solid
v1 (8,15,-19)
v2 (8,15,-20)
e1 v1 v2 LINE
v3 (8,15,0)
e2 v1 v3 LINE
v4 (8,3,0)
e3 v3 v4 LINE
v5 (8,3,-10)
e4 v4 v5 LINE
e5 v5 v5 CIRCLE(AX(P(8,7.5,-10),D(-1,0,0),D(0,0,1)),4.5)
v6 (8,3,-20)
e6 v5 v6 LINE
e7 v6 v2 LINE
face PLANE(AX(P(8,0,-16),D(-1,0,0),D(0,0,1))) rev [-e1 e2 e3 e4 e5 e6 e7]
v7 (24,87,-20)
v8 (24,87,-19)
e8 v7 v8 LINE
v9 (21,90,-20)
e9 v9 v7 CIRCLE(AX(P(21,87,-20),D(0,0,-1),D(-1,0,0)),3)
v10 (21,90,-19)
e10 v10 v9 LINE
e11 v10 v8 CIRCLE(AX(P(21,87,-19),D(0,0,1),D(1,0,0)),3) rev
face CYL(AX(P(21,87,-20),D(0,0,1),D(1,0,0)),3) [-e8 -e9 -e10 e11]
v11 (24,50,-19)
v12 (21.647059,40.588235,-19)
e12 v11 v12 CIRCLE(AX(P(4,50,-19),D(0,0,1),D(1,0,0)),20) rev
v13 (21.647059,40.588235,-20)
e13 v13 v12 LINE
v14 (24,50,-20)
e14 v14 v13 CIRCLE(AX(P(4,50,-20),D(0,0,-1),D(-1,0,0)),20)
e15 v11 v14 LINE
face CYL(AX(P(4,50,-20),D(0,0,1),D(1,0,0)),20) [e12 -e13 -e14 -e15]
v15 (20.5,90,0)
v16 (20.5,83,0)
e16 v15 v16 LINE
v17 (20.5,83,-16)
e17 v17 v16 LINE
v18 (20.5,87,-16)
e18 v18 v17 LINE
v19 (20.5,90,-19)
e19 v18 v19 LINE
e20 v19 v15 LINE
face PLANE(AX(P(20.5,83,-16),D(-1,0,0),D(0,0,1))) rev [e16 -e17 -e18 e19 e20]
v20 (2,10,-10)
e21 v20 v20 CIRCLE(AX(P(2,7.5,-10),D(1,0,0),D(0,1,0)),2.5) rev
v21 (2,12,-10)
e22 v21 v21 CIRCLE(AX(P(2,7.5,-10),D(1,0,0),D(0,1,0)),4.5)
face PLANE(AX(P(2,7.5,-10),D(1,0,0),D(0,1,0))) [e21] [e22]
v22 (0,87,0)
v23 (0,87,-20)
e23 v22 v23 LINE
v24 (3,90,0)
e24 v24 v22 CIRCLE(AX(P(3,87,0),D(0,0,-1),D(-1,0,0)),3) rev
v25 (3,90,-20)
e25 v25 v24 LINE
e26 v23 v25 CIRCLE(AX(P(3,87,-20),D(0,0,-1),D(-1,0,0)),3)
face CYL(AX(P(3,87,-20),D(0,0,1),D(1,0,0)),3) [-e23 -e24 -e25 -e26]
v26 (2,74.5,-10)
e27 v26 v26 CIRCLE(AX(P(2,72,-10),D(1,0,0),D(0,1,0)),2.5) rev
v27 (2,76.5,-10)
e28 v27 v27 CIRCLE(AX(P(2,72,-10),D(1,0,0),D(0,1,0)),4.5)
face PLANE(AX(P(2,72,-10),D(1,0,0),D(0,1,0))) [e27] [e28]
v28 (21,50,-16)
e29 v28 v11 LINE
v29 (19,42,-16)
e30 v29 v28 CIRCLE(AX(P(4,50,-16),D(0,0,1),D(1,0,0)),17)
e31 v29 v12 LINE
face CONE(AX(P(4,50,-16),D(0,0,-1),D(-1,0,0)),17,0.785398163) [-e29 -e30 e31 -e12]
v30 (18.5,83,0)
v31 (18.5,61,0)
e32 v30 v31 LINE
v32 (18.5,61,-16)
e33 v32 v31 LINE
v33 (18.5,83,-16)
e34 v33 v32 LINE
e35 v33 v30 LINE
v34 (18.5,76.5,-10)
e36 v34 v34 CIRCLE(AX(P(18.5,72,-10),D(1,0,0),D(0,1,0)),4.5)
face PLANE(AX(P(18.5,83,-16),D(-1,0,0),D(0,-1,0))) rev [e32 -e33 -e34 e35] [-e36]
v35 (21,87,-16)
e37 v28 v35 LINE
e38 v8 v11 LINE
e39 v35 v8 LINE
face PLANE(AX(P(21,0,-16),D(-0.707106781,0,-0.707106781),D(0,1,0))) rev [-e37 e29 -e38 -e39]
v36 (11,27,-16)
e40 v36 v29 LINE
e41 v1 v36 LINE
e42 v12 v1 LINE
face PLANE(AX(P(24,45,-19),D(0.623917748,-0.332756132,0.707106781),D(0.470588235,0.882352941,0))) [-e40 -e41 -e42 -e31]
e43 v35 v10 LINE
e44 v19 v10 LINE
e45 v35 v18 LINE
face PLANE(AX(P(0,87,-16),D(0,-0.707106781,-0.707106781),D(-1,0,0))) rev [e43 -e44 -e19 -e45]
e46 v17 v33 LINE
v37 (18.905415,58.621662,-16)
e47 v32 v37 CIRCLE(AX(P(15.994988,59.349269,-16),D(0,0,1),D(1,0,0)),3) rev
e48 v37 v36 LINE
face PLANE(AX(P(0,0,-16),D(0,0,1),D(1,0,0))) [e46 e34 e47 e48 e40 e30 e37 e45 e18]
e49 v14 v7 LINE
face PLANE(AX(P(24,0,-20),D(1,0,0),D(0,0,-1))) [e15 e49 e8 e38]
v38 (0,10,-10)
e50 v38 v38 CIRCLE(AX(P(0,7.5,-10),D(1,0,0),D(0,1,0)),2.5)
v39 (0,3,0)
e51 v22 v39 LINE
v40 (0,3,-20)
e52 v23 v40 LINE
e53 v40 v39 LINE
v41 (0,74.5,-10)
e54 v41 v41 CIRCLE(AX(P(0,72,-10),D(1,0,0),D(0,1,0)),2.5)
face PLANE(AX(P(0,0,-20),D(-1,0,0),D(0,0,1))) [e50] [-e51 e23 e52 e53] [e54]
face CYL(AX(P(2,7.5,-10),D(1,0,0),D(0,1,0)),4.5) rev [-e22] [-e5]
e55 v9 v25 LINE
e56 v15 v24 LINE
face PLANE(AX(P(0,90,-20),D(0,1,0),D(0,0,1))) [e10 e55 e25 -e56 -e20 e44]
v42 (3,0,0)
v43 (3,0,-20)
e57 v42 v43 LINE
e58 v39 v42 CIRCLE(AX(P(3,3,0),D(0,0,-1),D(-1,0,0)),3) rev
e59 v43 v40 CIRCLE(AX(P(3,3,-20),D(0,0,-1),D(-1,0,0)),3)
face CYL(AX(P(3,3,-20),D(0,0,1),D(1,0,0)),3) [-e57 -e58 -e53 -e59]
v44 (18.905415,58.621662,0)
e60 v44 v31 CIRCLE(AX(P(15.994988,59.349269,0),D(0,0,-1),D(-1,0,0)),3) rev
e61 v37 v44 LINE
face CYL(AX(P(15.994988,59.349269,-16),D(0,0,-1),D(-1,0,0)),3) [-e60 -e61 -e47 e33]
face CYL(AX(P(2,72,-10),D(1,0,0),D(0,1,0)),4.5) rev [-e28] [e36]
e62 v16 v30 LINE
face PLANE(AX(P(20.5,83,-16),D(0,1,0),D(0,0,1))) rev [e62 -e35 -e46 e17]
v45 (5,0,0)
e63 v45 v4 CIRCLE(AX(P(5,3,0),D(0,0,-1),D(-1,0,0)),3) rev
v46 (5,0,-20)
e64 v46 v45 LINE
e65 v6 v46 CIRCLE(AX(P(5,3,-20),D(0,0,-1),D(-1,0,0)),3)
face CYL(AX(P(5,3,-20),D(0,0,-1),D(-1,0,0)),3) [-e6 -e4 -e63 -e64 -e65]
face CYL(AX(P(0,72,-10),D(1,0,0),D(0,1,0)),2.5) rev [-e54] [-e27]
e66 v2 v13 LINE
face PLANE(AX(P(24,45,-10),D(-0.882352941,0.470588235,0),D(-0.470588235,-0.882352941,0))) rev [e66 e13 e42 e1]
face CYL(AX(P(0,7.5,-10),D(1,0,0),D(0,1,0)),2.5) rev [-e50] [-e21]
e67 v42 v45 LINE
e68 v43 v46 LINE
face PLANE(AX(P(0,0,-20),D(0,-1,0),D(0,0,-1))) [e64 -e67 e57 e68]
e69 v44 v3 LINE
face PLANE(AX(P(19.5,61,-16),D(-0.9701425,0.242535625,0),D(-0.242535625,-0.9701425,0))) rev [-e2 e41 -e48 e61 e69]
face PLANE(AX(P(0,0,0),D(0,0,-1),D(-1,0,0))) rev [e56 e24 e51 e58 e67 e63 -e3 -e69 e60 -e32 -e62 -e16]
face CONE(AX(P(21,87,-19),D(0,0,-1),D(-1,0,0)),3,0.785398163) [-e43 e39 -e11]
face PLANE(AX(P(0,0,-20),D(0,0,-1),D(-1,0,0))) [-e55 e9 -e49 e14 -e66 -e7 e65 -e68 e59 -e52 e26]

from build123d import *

# Parameters (mm, degrees)
SKETCH1_W           = 24
SKETCH1_H           = 90
BOSS_EXTRUDE1_DEPTH = 20
CUT_EXTRUDE1_DEPTH  = 16
CUT_EXTRUDE8_DEPTH  = 10
FILLET1_R           = 20
SKETCH12_R          = 2.5
CUT_EXTRUDE9_DEPTH  = 18.5
SKETCH13_R          = 4.5
CUT_EXTRUDE10_DEPTH = 16.5
FILLET2_R           = 3
CHAMFER1_SIZE       = 3


with BuildPart() as part:
    # Sketch1 → Boss-Extrude1 (new body)
    with BuildSketch(Plane.XY):
        with Locations((12, 45)):
            Rectangle(SKETCH1_W, SKETCH1_H)
    extrude(amount=-BOSS_EXTRUDE1_DEPTH)

    # Sketch4 → Cut-Extrude1 (cut)
    with BuildSketch(Plane.XY):
        Polygon((20.5, 83), (18.5, 83), (18.5, 61), (19.5, 61), (8, 15), (8, 0), (24, 0), (24, 90), (20.5, 90), align=None)
    extrude(amount=-CUT_EXTRUDE1_DEPTH, mode=Mode.SUBTRACT)

    # Sketch9 → Cut-Extrude8 (cut)
    with BuildSketch(Plane(origin=(0, 0, -20), x_dir=(-1, 0, 0), z_dir=(0, 0, -1))):
        Polygon((-24, 0), (-24, 45), (-8, 15), (-8, 0), align=None)
    extrude(amount=-CUT_EXTRUDE8_DEPTH, mode=Mode.SUBTRACT)

    # Fillet1
    fillet1_edges = [part.edges().sort_by_distance(p)[0] for p in [
        (24, 45, -18),
    ]]
    fillet(fillet1_edges, radius=FILLET1_R)

    # Sketch12 → Cut-Extrude9 (cut)
    with BuildSketch(Plane(origin=(18.5, 0, 0), x_dir=(0, 0, -1), z_dir=(1, 0, 0))):
        with Locations(Location((10, 72, 0), (0, 0, 90))):
            Circle(SKETCH12_R)
        with Locations(Location((10, 7.5, 0), (0, 0, 90))):
            Circle(SKETCH12_R)
    extrude(amount=-CUT_EXTRUDE9_DEPTH, mode=Mode.SUBTRACT)

    # Sketch13 → Cut-Extrude10 (cut)
    with BuildSketch(Plane(origin=(18.5, 0, 0), x_dir=(0, 0, -1), z_dir=(1, 0, 0))):
        with Locations(Location((10, 72, 0), (0, 0, 90))):
            Circle(SKETCH13_R)
        with Locations(Location((10, 7.5, 0), (0, 0, 90))):
            Circle(SKETCH13_R)
    extrude(amount=-CUT_EXTRUDE10_DEPTH, mode=Mode.SUBTRACT)

    # Fillet2
    # the kernel refuses this fillet: 3 mm, written as the material it takes off along each edge
    with BuildSketch(Plane(origin=(0, 90, 7.5), x_dir=(1, 0, 0), z_dir=(0, 0, -1)), Plane(origin=(8, 0, -27.5), x_dir=(0, 1, 0), z_dir=(0, 0, 1)), Plane(origin=(0, 0, 7.5), x_dir=(0, 1, 0), z_dir=(0, 0, -1))) as fillet2_piece_1:
        with BuildLine():
            CenterArc((FILLET2_R, FILLET2_R), FILLET2_R, 180, 90)
            Line((0, FILLET2_R), (-FILLET2_R * 0.02, FILLET2_R))
            Line((-FILLET2_R * 0.02, FILLET2_R), (-FILLET2_R * 0.02, -FILLET2_R * 0.02))
            Line((-FILLET2_R * 0.02, -FILLET2_R * 0.02), (FILLET2_R, -FILLET2_R * 0.02))
            Line((FILLET2_R, -FILLET2_R * 0.02), (FILLET2_R, 0))
        make_face()
    extrude(amount=35, mode=Mode.SUBTRACT)
    with BuildSketch(Plane(origin=(24, 90, -8.5), x_dir=(0, -1, 0), z_dir=(0, 0, -1))) as fillet2_piece_2:
        with BuildLine():
            CenterArc((FILLET2_R, FILLET2_R), FILLET2_R, 180, 90)
            Line((0, FILLET2_R), (-FILLET2_R * 0.02, FILLET2_R))
            Line((-FILLET2_R * 0.02, FILLET2_R), (-FILLET2_R * 0.02, -FILLET2_R * 0.02))
            Line((-FILLET2_R * 0.02, -FILLET2_R * 0.02), (FILLET2_R, -FILLET2_R * 0.02))
            Line((FILLET2_R, -FILLET2_R * 0.02), (FILLET2_R, 0))
        make_face()
    extrude(amount=19, mode=Mode.SUBTRACT)
    with BuildSketch(Plane(origin=(19.5, 61, 6.128837665), x_dir=(-0.24253562503633366, -0.9701425001453317, 0), z_dir=(0, 0, -1))) as fillet2_piece_3:
        with BuildLine():
            CenterArc((2.451535066, 3), FILLET2_R, 222.580014358, 47.419985642)
            Line((0.242535625, 0.9701425), (0.198355636, 0.92954535))
            ThreePointArc((0.198355636, 0.92954535), (0.063059263, 0.499623388), (-0.05820855, 0.014552138))
            Line((-0.05820855, 0.014552138), (0, -0.06))
            Line((0, -0.06), (2.451535066, -0.06))
            Line((2.451535066, -0.06), (2.451535066, 0))
        make_face()
    extrude(amount=22.128837665, mode=Mode.SUBTRACT)

    # Chamfer1
    # the kernel refuses this chamfer: 3 mm, written as the material it takes off along each edge
    with BuildSketch(Plane(origin=(21, 87, -16), x_dir=(1, 0, 0), z_dir=(0, -1, 0))) as chamfer1_piece_1:
        Polygon((3 - CHAMFER1_SIZE, 0), (3, -CHAMFER1_SIZE), (3, 0), align=None)
    revolve(axis=Axis((21, 87, -16), (0, 0, 1)), revolution_arc=90, mode=Mode.SUBTRACT)
    with BuildSketch(Plane(origin=(24, 50, -16), x_dir=(-1, 0, 0), z_dir=(0, 1, 0))) as chamfer1_piece_2:
        Polygon((CHAMFER1_SIZE, 0), (0, -CHAMFER1_SIZE), (0, 0), align=None)
    extrude(amount=37, mode=Mode.SUBTRACT)
    with BuildSketch(Plane(origin=(4.369388723, 8.192603855, -16), x_dir=(0, 0, -1), z_dir=(0.47058823529411764, 0.8823529411764706, 0))) as chamfer1_piece_3_section:
        Polygon((CHAMFER1_SIZE, 0), (0, CHAMFER1_SIZE), (0, 0), align=None)
    chamfer1_piece_3 = extrude(amount=36.715048964, mode=Mode.PRIVATE)
    chamfer1_piece_3 = split(chamfer1_piece_3, bisect_by=Plane(origin=(8, 8.192603855, -16), z_dir=(1, 0, 0)), keep=Keep.TOP, mode=Mode.PRIVATE)
    chamfer1_piece_3 = split(chamfer1_piece_3, bisect_by=Plane(origin=(6.184694361, 7.738777446, -16), z_dir=(0.9701425001453319, -0.24253562503633322, 0)), keep=Keep.TOP, mode=Mode.PRIVATE)
    add(chamfer1_piece_3, mode=Mode.SUBTRACT)
    with BuildSketch(Plane(origin=(4, 50, -16), x_dir=(0.8823529411764705, -0.47058823529411764, 0), z_dir=(-0.47058823529411764, -0.8823529411764705, 0))) as chamfer1_piece_4:
        Polygon((20, -CHAMFER1_SIZE), (20 - CHAMFER1_SIZE, 0), (20, 0), align=None)
    revolve(axis=Axis((4, 50, -16), (0, 0, 1)), revolution_arc=28.072486936, mode=Mode.SUBTRACT)
    with BuildSketch(Plane(origin=(21, 90, -16), x_dir=(0, -1, 0), z_dir=(-1, 0, 0))) as chamfer1_piece_5:
        Polygon((CHAMFER1_SIZE, 0), (0, -CHAMFER1_SIZE), (0, 0), align=None)
    extrude(amount=0.5, mode=Mode.SUBTRACT)


solid = part.part
